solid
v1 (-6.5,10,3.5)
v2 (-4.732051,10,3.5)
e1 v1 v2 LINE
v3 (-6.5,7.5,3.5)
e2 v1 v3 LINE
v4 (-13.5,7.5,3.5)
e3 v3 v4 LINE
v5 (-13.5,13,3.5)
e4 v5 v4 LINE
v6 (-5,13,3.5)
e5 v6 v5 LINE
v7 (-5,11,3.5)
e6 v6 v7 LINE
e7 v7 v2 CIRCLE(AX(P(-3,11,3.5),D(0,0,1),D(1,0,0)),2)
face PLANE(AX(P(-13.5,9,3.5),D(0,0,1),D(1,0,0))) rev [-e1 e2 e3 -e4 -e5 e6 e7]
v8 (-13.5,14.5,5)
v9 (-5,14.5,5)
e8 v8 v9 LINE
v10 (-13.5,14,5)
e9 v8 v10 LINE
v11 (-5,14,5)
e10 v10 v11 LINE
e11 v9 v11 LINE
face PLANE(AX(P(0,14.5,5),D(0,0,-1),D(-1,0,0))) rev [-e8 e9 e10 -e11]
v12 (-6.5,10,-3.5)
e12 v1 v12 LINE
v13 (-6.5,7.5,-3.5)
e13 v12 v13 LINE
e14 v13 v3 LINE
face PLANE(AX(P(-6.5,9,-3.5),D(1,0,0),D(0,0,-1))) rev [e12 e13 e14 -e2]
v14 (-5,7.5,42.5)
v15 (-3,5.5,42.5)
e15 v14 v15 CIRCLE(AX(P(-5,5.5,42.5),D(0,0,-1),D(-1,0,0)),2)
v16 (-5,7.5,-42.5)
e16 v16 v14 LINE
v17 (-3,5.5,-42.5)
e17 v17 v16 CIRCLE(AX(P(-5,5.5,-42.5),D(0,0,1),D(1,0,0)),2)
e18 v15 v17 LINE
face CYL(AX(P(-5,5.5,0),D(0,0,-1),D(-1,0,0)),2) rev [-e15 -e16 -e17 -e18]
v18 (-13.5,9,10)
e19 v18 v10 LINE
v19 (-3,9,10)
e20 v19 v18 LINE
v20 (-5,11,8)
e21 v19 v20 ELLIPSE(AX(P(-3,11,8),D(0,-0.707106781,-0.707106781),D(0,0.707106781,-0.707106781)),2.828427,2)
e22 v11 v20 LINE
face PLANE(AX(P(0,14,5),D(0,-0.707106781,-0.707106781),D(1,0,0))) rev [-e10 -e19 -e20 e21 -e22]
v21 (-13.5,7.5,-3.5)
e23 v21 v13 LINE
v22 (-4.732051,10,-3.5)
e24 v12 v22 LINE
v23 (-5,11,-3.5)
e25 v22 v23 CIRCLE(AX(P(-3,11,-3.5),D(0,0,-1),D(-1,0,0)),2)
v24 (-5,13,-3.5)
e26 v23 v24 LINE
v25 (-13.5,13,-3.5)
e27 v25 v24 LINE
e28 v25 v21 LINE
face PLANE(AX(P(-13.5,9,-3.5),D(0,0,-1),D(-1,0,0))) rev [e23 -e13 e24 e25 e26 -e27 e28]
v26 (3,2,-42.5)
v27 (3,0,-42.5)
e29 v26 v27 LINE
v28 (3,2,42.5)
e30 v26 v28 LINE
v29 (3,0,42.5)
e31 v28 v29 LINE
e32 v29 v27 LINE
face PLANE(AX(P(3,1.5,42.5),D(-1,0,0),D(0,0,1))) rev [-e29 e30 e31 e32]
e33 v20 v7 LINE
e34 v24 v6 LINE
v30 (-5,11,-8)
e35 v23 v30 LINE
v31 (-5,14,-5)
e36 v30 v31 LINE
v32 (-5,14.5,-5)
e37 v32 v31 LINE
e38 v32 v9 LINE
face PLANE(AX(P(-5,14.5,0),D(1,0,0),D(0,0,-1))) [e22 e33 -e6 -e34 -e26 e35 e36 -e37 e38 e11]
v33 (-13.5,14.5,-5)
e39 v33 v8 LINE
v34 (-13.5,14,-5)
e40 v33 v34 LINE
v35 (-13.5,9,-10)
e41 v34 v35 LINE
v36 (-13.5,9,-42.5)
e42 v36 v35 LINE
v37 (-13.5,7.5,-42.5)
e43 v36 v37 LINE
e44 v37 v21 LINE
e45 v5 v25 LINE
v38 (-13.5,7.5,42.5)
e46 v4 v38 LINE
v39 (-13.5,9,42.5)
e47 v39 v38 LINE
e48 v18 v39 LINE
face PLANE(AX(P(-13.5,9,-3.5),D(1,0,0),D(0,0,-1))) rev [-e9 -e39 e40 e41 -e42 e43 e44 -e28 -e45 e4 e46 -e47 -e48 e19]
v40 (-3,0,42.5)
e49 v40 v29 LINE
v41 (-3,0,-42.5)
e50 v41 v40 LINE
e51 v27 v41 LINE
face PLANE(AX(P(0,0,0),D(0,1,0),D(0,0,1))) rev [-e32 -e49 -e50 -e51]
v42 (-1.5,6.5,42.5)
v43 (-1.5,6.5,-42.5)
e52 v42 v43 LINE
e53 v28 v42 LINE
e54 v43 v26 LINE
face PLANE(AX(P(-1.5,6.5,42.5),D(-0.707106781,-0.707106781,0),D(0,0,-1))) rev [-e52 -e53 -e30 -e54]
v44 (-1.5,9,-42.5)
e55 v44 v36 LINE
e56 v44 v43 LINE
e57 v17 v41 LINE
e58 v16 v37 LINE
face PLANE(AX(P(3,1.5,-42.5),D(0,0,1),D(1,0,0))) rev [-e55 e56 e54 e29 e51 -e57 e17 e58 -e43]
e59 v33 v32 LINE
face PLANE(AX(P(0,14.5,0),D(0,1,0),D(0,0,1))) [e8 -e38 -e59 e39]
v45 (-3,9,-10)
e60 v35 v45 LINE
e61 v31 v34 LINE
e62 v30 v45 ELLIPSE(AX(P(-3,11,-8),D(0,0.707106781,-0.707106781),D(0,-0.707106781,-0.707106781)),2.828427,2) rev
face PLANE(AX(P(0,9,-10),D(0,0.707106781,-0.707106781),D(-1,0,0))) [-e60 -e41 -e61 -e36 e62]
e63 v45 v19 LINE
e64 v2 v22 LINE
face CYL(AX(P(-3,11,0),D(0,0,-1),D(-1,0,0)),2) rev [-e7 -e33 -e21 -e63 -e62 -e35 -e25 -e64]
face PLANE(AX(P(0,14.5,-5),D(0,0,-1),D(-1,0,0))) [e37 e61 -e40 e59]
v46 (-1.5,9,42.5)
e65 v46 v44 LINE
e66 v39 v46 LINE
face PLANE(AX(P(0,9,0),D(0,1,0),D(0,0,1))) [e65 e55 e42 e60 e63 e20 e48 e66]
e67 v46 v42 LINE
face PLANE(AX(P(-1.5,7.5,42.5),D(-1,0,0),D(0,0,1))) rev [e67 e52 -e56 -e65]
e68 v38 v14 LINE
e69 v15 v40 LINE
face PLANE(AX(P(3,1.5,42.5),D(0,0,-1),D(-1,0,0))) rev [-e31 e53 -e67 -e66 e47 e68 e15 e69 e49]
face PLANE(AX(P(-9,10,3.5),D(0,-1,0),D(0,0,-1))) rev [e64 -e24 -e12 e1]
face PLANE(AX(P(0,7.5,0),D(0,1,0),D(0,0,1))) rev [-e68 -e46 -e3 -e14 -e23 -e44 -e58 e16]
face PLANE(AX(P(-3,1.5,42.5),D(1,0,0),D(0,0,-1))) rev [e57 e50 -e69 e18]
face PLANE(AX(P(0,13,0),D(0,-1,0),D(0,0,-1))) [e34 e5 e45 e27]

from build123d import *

# Parameters (mm, degrees)
SKETCH_1_W          = 6
SKETCH_1_H          = 85
EXTRUDE_1_DEPTH     = 1.5
SKETCH_2_W          = 1.5
SKETCH_2_H          = 85
EXTRUDE_2_DEPTH     = 6
EXTRUDE_3_DEPTH     = 1.5
SKETCH_4_W          = 7
SKETCH_4_H          = 7
EXTRUDE_4_DEPTH     = 5.5
SKETCH_5_W          = 7
SKETCH_5_H          = 7
CUT_EXTRUDE_1_DEPTH = 4
SKETCH_6_W          = 7
SKETCH_6_H          = 3
CUT_EXTRUDE_2_DEPTH = 4
CHAMFER_1_SIZE      = 5
CHAMFER_2_SIZE      = 5
FILLET_1_R          = 2
FILLET_2_R          = 2


with BuildPart() as part:
    # Эскиз1 → Бобышка-Вытянуть1 (new body)
    with BuildSketch(Plane(origin=(0, 0, 0), x_dir=(1, 0, 0), z_dir=(0, 1, 0))):
        Rectangle(SKETCH_1_W, SKETCH_1_H)
    extrude(amount=EXTRUDE_1_DEPTH)

    # Эскиз2 → Бобышка-Вытянуть2 (add)
    with BuildSketch(Plane(origin=(0, 1.5, 0), x_dir=(1, 0, 0), z_dir=(0, 1, 0))):
        with Locations((-2.25, 0)):
            Rectangle(SKETCH_2_W, SKETCH_2_H)
    extrude(amount=EXTRUDE_2_DEPTH)

    # Эскиз3 → Бобышка-Вытянуть3 (add)
    with BuildSketch(Plane(origin=(0, 7.5, 0), x_dir=(1, 0, 0), z_dir=(0, 1, 0))):
        Polygon((-1.5, -42.5), (-13.5, -42.5), (-13.5, -3.5), (-6.5, -3.5), (-6.5, 3.5), (-13.5, 3.5), (-13.5, 42.5), (-1.5, 42.5), align=None)
    extrude(amount=EXTRUDE_3_DEPTH)

    # Эскиз4 → Бобышка-Вытянуть4 (add)
    with BuildSketch(Plane(origin=(0, 9, 0), x_dir=(1, 0, 0), z_dir=(0, 1, 0))):
        Polygon((-13.5, -3.5), (-13.5, -5), (-5, -5), (-5, 5), (-13.5, 5), (-13.5, 3.5), (-6.5, 3.5), (-6.5, -3.5), align=None)
        with Locations((-10, 0)):
            Rectangle(SKETCH_4_W, SKETCH_4_H)
    extrude(amount=EXTRUDE_4_DEPTH)

    # Эскиз5 → Вырез-Вытянуть1 (cut)
    with BuildSketch(Plane.XZ.offset(-9)):
        with Locations((-10, 0)):
            Rectangle(SKETCH_5_W, SKETCH_5_H)
    extrude(amount=-CUT_EXTRUDE_1_DEPTH, mode=Mode.SUBTRACT)

    # Эскиз6 → Вырез-Вытянуть2 (cut)
    with BuildSketch(Plane(origin=(-5, 0, 0), x_dir=(0, 0, -1), z_dir=(1, 0, 0))):
        with Locations((0, 11.5)):
            Rectangle(SKETCH_6_W, SKETCH_6_H)
    extrude(amount=-CUT_EXTRUDE_2_DEPTH, mode=Mode.SUBTRACT)

    # Фаска1
    # the kernel refuses this chamfer: 5 mm, written as the material it adds along each edge
    with BuildSketch(Plane(origin=(-1.5, 1.5, 42.5), x_dir=(-0.02749587661058636, 0.9996219169112968, 0), z_dir=(0, 0, -1))) as chamfer_1_piece_1_section:
        Polygon((CHAMFER_1_SIZE * 0.999621916911, CHAMFER_1_SIZE * 0.0274958766106), (-CHAMFER_1_SIZE * 0.0274958766106, CHAMFER_1_SIZE * 0.999621916911), (0, 0), align=None)
    chamfer_1_piece_1 = extrude(amount=85, mode=Mode.PRIVATE)
    chamfer_1_piece_1 = split(chamfer_1_piece_1, bisect_by=Plane(origin=(3, 3.179503735, 0), z_dir=(-1, 0, 0)), keep=Keep.TOP, mode=Mode.PRIVATE)
    add(chamfer_1_piece_1)

    # Фаска2
    chamfer_2_edges = [part.edges().sort_by_distance(p)[0] for p in [
        (-9.25, 9, 5),
        (-9.25, 9, -5),
    ]]
    chamfer(chamfer_2_edges, length=CHAMFER_2_SIZE)

    # Скругление1
    # the kernel refuses this fillet: 2 mm, written as the material it adds along each edge
    with BuildSketch(Plane(origin=(-5, 9, -15), x_dir=(1, 0, 0), z_dir=(0, 0, 1))) as fillet_1_piece_1_section:
        with BuildLine():
            CenterArc((FILLET_1_R, FILLET_1_R), FILLET_1_R, 180, 90)
            Line((0, FILLET_1_R), (0, 0))
            Line((0, 0), (FILLET_1_R, 0))
        make_face()
    fillet_1_piece_1 = extrude(amount=30, mode=Mode.PRIVATE)
    fillet_1_piece_1 = split(fillet_1_piece_1, bisect_by=Plane(origin=(-4.478955551, 10.861954239, -8.138045761), z_dir=(0, -0.7071067811865476, 0.7071067811865475)), keep=Keep.TOP, mode=Mode.PRIVATE)
    fillet_1_piece_1 = split(fillet_1_piece_1, bisect_by=Plane(origin=(-4.478955551, 10, -6.592030507), z_dir=(0, -1, 0)), keep=Keep.TOP, mode=Mode.PRIVATE)
    fillet_1_piece_1 = split(fillet_1_piece_1, bisect_by=Plane(origin=(-4.478955551, 9.315938986, -3.5), z_dir=(0, 0, -1)), keep=Keep.TOP, mode=Mode.PRIVATE)
    add(fillet_1_piece_1)
    with BuildSketch(Plane(origin=(-5, 9, -15), x_dir=(1, 0, 0), z_dir=(0, 0, 1))) as fillet_1_piece_2_section:
        with BuildLine():
            CenterArc((FILLET_1_R, FILLET_1_R), FILLET_1_R, 180, 90)
            Line((0, FILLET_1_R), (0, 0))
            Line((0, 0), (FILLET_1_R, 0))
        make_face()
    fillet_1_piece_2 = extrude(amount=30, mode=Mode.PRIVATE)
    fillet_1_piece_2 = split(fillet_1_piece_2, bisect_by=Plane(origin=(-4.950049331, 11.610374757, -7.389625243), z_dir=(0, -0.7071067811865476, 0.7071067811865475)), keep=Keep.TOP, mode=Mode.PRIVATE)
    fillet_1_piece_2 = split(fillet_1_piece_2, bisect_by=Plane(origin=(-4.950049331, 10, -6.093083495), z_dir=(0, 1, 0)), keep=Keep.TOP, mode=Mode.PRIVATE)
    fillet_1_piece_2 = split(fillet_1_piece_2, bisect_by=Plane(origin=(-4.950049331, 10.313833009, -3.5), z_dir=(0, 0, -1)), keep=Keep.TOP, mode=Mode.PRIVATE)
    add(fillet_1_piece_2)
    with BuildSketch(Plane(origin=(-5, 9, -15), x_dir=(1, 0, 0), z_dir=(0, 0, 1))) as fillet_1_piece_3_section:
        with BuildLine():
            CenterArc((FILLET_1_R, FILLET_1_R), FILLET_1_R, 180, 90)
            Line((0, FILLET_1_R), (0, 0))
            Line((0, 0), (FILLET_1_R, 0))
        make_face()
    fillet_1_piece_3 = extrude(amount=30, mode=Mode.PRIVATE)
    fillet_1_piece_3 = split(fillet_1_piece_3, bisect_by=Plane(origin=(-4.48975988, 9.328783529, 3.5), z_dir=(0, 0, -1)), keep=Keep.TOP, mode=Mode.PRIVATE)
    fillet_1_piece_3 = split(fillet_1_piece_3, bisect_by=Plane(origin=(-4.48975988, 10, 0), z_dir=(0, -1, 0)), keep=Keep.TOP, mode=Mode.PRIVATE)
    fillet_1_piece_3 = split(fillet_1_piece_3, bisect_by=Plane(origin=(-4.48975988, 9.328783529, -3.5), z_dir=(0, 0, 1)), keep=Keep.TOP, mode=Mode.PRIVATE)
    add(fillet_1_piece_3)
    with BuildSketch(Plane(origin=(-5, 9, -15), x_dir=(1, 0, 0), z_dir=(0, 0, 1))) as fillet_1_piece_4_section:
        with BuildLine():
            CenterArc((FILLET_1_R, FILLET_1_R), FILLET_1_R, 180, 90)
            Line((0, FILLET_1_R), (0, 0))
            Line((0, 0), (FILLET_1_R, 0))
        make_face()
    fillet_1_piece_4 = extrude(amount=30, mode=Mode.PRIVATE)
    fillet_1_piece_4 = split(fillet_1_piece_4, bisect_by=Plane(origin=(-4.478955551, 10.861954239, 8.138045761), z_dir=(0, -0.7071067811865475, -0.7071067811865476)), keep=Keep.TOP, mode=Mode.PRIVATE)
    fillet_1_piece_4 = split(fillet_1_piece_4, bisect_by=Plane(origin=(-4.478955551, 9.315938986, 3.5), z_dir=(0, 0, 1)), keep=Keep.TOP, mode=Mode.PRIVATE)
    fillet_1_piece_4 = split(fillet_1_piece_4, bisect_by=Plane(origin=(-4.478955551, 10, 6.592030507), z_dir=(0, -1, 0)), keep=Keep.TOP, mode=Mode.PRIVATE)
    add(fillet_1_piece_4)
    with BuildSketch(Plane(origin=(-5, 9, -15), x_dir=(1, 0, 0), z_dir=(0, 0, 1))) as fillet_1_piece_5_section:
        with BuildLine():
            CenterArc((FILLET_1_R, FILLET_1_R), FILLET_1_R, 180, 90)
            Line((0, FILLET_1_R), (0, 0))
            Line((0, 0), (FILLET_1_R, 0))
        make_face()
    fillet_1_piece_5 = extrude(amount=30, mode=Mode.PRIVATE)
    fillet_1_piece_5 = split(fillet_1_piece_5, bisect_by=Plane(origin=(-4.950049331, 11.610374757, 7.389625243), z_dir=(0, -0.7071067811865475, -0.7071067811865476)), keep=Keep.TOP, mode=Mode.PRIVATE)
    fillet_1_piece_5 = split(fillet_1_piece_5, bisect_by=Plane(origin=(-4.950049331, 10.313833009, 3.5), z_dir=(0, 0, 1)), keep=Keep.TOP, mode=Mode.PRIVATE)
    fillet_1_piece_5 = split(fillet_1_piece_5, bisect_by=Plane(origin=(-4.950049331, 10, 6.093083495), z_dir=(0, 1, 0)), keep=Keep.TOP, mode=Mode.PRIVATE)
    add(fillet_1_piece_5)

    # Скругление2
    fillet_2_edges = [part.edges().sort_by_distance(p)[0] for p in [
        (-3, 7.5, 0),
    ]]
    fillet(fillet_2_edges, radius=FILLET_2_R)


solid = part.part
